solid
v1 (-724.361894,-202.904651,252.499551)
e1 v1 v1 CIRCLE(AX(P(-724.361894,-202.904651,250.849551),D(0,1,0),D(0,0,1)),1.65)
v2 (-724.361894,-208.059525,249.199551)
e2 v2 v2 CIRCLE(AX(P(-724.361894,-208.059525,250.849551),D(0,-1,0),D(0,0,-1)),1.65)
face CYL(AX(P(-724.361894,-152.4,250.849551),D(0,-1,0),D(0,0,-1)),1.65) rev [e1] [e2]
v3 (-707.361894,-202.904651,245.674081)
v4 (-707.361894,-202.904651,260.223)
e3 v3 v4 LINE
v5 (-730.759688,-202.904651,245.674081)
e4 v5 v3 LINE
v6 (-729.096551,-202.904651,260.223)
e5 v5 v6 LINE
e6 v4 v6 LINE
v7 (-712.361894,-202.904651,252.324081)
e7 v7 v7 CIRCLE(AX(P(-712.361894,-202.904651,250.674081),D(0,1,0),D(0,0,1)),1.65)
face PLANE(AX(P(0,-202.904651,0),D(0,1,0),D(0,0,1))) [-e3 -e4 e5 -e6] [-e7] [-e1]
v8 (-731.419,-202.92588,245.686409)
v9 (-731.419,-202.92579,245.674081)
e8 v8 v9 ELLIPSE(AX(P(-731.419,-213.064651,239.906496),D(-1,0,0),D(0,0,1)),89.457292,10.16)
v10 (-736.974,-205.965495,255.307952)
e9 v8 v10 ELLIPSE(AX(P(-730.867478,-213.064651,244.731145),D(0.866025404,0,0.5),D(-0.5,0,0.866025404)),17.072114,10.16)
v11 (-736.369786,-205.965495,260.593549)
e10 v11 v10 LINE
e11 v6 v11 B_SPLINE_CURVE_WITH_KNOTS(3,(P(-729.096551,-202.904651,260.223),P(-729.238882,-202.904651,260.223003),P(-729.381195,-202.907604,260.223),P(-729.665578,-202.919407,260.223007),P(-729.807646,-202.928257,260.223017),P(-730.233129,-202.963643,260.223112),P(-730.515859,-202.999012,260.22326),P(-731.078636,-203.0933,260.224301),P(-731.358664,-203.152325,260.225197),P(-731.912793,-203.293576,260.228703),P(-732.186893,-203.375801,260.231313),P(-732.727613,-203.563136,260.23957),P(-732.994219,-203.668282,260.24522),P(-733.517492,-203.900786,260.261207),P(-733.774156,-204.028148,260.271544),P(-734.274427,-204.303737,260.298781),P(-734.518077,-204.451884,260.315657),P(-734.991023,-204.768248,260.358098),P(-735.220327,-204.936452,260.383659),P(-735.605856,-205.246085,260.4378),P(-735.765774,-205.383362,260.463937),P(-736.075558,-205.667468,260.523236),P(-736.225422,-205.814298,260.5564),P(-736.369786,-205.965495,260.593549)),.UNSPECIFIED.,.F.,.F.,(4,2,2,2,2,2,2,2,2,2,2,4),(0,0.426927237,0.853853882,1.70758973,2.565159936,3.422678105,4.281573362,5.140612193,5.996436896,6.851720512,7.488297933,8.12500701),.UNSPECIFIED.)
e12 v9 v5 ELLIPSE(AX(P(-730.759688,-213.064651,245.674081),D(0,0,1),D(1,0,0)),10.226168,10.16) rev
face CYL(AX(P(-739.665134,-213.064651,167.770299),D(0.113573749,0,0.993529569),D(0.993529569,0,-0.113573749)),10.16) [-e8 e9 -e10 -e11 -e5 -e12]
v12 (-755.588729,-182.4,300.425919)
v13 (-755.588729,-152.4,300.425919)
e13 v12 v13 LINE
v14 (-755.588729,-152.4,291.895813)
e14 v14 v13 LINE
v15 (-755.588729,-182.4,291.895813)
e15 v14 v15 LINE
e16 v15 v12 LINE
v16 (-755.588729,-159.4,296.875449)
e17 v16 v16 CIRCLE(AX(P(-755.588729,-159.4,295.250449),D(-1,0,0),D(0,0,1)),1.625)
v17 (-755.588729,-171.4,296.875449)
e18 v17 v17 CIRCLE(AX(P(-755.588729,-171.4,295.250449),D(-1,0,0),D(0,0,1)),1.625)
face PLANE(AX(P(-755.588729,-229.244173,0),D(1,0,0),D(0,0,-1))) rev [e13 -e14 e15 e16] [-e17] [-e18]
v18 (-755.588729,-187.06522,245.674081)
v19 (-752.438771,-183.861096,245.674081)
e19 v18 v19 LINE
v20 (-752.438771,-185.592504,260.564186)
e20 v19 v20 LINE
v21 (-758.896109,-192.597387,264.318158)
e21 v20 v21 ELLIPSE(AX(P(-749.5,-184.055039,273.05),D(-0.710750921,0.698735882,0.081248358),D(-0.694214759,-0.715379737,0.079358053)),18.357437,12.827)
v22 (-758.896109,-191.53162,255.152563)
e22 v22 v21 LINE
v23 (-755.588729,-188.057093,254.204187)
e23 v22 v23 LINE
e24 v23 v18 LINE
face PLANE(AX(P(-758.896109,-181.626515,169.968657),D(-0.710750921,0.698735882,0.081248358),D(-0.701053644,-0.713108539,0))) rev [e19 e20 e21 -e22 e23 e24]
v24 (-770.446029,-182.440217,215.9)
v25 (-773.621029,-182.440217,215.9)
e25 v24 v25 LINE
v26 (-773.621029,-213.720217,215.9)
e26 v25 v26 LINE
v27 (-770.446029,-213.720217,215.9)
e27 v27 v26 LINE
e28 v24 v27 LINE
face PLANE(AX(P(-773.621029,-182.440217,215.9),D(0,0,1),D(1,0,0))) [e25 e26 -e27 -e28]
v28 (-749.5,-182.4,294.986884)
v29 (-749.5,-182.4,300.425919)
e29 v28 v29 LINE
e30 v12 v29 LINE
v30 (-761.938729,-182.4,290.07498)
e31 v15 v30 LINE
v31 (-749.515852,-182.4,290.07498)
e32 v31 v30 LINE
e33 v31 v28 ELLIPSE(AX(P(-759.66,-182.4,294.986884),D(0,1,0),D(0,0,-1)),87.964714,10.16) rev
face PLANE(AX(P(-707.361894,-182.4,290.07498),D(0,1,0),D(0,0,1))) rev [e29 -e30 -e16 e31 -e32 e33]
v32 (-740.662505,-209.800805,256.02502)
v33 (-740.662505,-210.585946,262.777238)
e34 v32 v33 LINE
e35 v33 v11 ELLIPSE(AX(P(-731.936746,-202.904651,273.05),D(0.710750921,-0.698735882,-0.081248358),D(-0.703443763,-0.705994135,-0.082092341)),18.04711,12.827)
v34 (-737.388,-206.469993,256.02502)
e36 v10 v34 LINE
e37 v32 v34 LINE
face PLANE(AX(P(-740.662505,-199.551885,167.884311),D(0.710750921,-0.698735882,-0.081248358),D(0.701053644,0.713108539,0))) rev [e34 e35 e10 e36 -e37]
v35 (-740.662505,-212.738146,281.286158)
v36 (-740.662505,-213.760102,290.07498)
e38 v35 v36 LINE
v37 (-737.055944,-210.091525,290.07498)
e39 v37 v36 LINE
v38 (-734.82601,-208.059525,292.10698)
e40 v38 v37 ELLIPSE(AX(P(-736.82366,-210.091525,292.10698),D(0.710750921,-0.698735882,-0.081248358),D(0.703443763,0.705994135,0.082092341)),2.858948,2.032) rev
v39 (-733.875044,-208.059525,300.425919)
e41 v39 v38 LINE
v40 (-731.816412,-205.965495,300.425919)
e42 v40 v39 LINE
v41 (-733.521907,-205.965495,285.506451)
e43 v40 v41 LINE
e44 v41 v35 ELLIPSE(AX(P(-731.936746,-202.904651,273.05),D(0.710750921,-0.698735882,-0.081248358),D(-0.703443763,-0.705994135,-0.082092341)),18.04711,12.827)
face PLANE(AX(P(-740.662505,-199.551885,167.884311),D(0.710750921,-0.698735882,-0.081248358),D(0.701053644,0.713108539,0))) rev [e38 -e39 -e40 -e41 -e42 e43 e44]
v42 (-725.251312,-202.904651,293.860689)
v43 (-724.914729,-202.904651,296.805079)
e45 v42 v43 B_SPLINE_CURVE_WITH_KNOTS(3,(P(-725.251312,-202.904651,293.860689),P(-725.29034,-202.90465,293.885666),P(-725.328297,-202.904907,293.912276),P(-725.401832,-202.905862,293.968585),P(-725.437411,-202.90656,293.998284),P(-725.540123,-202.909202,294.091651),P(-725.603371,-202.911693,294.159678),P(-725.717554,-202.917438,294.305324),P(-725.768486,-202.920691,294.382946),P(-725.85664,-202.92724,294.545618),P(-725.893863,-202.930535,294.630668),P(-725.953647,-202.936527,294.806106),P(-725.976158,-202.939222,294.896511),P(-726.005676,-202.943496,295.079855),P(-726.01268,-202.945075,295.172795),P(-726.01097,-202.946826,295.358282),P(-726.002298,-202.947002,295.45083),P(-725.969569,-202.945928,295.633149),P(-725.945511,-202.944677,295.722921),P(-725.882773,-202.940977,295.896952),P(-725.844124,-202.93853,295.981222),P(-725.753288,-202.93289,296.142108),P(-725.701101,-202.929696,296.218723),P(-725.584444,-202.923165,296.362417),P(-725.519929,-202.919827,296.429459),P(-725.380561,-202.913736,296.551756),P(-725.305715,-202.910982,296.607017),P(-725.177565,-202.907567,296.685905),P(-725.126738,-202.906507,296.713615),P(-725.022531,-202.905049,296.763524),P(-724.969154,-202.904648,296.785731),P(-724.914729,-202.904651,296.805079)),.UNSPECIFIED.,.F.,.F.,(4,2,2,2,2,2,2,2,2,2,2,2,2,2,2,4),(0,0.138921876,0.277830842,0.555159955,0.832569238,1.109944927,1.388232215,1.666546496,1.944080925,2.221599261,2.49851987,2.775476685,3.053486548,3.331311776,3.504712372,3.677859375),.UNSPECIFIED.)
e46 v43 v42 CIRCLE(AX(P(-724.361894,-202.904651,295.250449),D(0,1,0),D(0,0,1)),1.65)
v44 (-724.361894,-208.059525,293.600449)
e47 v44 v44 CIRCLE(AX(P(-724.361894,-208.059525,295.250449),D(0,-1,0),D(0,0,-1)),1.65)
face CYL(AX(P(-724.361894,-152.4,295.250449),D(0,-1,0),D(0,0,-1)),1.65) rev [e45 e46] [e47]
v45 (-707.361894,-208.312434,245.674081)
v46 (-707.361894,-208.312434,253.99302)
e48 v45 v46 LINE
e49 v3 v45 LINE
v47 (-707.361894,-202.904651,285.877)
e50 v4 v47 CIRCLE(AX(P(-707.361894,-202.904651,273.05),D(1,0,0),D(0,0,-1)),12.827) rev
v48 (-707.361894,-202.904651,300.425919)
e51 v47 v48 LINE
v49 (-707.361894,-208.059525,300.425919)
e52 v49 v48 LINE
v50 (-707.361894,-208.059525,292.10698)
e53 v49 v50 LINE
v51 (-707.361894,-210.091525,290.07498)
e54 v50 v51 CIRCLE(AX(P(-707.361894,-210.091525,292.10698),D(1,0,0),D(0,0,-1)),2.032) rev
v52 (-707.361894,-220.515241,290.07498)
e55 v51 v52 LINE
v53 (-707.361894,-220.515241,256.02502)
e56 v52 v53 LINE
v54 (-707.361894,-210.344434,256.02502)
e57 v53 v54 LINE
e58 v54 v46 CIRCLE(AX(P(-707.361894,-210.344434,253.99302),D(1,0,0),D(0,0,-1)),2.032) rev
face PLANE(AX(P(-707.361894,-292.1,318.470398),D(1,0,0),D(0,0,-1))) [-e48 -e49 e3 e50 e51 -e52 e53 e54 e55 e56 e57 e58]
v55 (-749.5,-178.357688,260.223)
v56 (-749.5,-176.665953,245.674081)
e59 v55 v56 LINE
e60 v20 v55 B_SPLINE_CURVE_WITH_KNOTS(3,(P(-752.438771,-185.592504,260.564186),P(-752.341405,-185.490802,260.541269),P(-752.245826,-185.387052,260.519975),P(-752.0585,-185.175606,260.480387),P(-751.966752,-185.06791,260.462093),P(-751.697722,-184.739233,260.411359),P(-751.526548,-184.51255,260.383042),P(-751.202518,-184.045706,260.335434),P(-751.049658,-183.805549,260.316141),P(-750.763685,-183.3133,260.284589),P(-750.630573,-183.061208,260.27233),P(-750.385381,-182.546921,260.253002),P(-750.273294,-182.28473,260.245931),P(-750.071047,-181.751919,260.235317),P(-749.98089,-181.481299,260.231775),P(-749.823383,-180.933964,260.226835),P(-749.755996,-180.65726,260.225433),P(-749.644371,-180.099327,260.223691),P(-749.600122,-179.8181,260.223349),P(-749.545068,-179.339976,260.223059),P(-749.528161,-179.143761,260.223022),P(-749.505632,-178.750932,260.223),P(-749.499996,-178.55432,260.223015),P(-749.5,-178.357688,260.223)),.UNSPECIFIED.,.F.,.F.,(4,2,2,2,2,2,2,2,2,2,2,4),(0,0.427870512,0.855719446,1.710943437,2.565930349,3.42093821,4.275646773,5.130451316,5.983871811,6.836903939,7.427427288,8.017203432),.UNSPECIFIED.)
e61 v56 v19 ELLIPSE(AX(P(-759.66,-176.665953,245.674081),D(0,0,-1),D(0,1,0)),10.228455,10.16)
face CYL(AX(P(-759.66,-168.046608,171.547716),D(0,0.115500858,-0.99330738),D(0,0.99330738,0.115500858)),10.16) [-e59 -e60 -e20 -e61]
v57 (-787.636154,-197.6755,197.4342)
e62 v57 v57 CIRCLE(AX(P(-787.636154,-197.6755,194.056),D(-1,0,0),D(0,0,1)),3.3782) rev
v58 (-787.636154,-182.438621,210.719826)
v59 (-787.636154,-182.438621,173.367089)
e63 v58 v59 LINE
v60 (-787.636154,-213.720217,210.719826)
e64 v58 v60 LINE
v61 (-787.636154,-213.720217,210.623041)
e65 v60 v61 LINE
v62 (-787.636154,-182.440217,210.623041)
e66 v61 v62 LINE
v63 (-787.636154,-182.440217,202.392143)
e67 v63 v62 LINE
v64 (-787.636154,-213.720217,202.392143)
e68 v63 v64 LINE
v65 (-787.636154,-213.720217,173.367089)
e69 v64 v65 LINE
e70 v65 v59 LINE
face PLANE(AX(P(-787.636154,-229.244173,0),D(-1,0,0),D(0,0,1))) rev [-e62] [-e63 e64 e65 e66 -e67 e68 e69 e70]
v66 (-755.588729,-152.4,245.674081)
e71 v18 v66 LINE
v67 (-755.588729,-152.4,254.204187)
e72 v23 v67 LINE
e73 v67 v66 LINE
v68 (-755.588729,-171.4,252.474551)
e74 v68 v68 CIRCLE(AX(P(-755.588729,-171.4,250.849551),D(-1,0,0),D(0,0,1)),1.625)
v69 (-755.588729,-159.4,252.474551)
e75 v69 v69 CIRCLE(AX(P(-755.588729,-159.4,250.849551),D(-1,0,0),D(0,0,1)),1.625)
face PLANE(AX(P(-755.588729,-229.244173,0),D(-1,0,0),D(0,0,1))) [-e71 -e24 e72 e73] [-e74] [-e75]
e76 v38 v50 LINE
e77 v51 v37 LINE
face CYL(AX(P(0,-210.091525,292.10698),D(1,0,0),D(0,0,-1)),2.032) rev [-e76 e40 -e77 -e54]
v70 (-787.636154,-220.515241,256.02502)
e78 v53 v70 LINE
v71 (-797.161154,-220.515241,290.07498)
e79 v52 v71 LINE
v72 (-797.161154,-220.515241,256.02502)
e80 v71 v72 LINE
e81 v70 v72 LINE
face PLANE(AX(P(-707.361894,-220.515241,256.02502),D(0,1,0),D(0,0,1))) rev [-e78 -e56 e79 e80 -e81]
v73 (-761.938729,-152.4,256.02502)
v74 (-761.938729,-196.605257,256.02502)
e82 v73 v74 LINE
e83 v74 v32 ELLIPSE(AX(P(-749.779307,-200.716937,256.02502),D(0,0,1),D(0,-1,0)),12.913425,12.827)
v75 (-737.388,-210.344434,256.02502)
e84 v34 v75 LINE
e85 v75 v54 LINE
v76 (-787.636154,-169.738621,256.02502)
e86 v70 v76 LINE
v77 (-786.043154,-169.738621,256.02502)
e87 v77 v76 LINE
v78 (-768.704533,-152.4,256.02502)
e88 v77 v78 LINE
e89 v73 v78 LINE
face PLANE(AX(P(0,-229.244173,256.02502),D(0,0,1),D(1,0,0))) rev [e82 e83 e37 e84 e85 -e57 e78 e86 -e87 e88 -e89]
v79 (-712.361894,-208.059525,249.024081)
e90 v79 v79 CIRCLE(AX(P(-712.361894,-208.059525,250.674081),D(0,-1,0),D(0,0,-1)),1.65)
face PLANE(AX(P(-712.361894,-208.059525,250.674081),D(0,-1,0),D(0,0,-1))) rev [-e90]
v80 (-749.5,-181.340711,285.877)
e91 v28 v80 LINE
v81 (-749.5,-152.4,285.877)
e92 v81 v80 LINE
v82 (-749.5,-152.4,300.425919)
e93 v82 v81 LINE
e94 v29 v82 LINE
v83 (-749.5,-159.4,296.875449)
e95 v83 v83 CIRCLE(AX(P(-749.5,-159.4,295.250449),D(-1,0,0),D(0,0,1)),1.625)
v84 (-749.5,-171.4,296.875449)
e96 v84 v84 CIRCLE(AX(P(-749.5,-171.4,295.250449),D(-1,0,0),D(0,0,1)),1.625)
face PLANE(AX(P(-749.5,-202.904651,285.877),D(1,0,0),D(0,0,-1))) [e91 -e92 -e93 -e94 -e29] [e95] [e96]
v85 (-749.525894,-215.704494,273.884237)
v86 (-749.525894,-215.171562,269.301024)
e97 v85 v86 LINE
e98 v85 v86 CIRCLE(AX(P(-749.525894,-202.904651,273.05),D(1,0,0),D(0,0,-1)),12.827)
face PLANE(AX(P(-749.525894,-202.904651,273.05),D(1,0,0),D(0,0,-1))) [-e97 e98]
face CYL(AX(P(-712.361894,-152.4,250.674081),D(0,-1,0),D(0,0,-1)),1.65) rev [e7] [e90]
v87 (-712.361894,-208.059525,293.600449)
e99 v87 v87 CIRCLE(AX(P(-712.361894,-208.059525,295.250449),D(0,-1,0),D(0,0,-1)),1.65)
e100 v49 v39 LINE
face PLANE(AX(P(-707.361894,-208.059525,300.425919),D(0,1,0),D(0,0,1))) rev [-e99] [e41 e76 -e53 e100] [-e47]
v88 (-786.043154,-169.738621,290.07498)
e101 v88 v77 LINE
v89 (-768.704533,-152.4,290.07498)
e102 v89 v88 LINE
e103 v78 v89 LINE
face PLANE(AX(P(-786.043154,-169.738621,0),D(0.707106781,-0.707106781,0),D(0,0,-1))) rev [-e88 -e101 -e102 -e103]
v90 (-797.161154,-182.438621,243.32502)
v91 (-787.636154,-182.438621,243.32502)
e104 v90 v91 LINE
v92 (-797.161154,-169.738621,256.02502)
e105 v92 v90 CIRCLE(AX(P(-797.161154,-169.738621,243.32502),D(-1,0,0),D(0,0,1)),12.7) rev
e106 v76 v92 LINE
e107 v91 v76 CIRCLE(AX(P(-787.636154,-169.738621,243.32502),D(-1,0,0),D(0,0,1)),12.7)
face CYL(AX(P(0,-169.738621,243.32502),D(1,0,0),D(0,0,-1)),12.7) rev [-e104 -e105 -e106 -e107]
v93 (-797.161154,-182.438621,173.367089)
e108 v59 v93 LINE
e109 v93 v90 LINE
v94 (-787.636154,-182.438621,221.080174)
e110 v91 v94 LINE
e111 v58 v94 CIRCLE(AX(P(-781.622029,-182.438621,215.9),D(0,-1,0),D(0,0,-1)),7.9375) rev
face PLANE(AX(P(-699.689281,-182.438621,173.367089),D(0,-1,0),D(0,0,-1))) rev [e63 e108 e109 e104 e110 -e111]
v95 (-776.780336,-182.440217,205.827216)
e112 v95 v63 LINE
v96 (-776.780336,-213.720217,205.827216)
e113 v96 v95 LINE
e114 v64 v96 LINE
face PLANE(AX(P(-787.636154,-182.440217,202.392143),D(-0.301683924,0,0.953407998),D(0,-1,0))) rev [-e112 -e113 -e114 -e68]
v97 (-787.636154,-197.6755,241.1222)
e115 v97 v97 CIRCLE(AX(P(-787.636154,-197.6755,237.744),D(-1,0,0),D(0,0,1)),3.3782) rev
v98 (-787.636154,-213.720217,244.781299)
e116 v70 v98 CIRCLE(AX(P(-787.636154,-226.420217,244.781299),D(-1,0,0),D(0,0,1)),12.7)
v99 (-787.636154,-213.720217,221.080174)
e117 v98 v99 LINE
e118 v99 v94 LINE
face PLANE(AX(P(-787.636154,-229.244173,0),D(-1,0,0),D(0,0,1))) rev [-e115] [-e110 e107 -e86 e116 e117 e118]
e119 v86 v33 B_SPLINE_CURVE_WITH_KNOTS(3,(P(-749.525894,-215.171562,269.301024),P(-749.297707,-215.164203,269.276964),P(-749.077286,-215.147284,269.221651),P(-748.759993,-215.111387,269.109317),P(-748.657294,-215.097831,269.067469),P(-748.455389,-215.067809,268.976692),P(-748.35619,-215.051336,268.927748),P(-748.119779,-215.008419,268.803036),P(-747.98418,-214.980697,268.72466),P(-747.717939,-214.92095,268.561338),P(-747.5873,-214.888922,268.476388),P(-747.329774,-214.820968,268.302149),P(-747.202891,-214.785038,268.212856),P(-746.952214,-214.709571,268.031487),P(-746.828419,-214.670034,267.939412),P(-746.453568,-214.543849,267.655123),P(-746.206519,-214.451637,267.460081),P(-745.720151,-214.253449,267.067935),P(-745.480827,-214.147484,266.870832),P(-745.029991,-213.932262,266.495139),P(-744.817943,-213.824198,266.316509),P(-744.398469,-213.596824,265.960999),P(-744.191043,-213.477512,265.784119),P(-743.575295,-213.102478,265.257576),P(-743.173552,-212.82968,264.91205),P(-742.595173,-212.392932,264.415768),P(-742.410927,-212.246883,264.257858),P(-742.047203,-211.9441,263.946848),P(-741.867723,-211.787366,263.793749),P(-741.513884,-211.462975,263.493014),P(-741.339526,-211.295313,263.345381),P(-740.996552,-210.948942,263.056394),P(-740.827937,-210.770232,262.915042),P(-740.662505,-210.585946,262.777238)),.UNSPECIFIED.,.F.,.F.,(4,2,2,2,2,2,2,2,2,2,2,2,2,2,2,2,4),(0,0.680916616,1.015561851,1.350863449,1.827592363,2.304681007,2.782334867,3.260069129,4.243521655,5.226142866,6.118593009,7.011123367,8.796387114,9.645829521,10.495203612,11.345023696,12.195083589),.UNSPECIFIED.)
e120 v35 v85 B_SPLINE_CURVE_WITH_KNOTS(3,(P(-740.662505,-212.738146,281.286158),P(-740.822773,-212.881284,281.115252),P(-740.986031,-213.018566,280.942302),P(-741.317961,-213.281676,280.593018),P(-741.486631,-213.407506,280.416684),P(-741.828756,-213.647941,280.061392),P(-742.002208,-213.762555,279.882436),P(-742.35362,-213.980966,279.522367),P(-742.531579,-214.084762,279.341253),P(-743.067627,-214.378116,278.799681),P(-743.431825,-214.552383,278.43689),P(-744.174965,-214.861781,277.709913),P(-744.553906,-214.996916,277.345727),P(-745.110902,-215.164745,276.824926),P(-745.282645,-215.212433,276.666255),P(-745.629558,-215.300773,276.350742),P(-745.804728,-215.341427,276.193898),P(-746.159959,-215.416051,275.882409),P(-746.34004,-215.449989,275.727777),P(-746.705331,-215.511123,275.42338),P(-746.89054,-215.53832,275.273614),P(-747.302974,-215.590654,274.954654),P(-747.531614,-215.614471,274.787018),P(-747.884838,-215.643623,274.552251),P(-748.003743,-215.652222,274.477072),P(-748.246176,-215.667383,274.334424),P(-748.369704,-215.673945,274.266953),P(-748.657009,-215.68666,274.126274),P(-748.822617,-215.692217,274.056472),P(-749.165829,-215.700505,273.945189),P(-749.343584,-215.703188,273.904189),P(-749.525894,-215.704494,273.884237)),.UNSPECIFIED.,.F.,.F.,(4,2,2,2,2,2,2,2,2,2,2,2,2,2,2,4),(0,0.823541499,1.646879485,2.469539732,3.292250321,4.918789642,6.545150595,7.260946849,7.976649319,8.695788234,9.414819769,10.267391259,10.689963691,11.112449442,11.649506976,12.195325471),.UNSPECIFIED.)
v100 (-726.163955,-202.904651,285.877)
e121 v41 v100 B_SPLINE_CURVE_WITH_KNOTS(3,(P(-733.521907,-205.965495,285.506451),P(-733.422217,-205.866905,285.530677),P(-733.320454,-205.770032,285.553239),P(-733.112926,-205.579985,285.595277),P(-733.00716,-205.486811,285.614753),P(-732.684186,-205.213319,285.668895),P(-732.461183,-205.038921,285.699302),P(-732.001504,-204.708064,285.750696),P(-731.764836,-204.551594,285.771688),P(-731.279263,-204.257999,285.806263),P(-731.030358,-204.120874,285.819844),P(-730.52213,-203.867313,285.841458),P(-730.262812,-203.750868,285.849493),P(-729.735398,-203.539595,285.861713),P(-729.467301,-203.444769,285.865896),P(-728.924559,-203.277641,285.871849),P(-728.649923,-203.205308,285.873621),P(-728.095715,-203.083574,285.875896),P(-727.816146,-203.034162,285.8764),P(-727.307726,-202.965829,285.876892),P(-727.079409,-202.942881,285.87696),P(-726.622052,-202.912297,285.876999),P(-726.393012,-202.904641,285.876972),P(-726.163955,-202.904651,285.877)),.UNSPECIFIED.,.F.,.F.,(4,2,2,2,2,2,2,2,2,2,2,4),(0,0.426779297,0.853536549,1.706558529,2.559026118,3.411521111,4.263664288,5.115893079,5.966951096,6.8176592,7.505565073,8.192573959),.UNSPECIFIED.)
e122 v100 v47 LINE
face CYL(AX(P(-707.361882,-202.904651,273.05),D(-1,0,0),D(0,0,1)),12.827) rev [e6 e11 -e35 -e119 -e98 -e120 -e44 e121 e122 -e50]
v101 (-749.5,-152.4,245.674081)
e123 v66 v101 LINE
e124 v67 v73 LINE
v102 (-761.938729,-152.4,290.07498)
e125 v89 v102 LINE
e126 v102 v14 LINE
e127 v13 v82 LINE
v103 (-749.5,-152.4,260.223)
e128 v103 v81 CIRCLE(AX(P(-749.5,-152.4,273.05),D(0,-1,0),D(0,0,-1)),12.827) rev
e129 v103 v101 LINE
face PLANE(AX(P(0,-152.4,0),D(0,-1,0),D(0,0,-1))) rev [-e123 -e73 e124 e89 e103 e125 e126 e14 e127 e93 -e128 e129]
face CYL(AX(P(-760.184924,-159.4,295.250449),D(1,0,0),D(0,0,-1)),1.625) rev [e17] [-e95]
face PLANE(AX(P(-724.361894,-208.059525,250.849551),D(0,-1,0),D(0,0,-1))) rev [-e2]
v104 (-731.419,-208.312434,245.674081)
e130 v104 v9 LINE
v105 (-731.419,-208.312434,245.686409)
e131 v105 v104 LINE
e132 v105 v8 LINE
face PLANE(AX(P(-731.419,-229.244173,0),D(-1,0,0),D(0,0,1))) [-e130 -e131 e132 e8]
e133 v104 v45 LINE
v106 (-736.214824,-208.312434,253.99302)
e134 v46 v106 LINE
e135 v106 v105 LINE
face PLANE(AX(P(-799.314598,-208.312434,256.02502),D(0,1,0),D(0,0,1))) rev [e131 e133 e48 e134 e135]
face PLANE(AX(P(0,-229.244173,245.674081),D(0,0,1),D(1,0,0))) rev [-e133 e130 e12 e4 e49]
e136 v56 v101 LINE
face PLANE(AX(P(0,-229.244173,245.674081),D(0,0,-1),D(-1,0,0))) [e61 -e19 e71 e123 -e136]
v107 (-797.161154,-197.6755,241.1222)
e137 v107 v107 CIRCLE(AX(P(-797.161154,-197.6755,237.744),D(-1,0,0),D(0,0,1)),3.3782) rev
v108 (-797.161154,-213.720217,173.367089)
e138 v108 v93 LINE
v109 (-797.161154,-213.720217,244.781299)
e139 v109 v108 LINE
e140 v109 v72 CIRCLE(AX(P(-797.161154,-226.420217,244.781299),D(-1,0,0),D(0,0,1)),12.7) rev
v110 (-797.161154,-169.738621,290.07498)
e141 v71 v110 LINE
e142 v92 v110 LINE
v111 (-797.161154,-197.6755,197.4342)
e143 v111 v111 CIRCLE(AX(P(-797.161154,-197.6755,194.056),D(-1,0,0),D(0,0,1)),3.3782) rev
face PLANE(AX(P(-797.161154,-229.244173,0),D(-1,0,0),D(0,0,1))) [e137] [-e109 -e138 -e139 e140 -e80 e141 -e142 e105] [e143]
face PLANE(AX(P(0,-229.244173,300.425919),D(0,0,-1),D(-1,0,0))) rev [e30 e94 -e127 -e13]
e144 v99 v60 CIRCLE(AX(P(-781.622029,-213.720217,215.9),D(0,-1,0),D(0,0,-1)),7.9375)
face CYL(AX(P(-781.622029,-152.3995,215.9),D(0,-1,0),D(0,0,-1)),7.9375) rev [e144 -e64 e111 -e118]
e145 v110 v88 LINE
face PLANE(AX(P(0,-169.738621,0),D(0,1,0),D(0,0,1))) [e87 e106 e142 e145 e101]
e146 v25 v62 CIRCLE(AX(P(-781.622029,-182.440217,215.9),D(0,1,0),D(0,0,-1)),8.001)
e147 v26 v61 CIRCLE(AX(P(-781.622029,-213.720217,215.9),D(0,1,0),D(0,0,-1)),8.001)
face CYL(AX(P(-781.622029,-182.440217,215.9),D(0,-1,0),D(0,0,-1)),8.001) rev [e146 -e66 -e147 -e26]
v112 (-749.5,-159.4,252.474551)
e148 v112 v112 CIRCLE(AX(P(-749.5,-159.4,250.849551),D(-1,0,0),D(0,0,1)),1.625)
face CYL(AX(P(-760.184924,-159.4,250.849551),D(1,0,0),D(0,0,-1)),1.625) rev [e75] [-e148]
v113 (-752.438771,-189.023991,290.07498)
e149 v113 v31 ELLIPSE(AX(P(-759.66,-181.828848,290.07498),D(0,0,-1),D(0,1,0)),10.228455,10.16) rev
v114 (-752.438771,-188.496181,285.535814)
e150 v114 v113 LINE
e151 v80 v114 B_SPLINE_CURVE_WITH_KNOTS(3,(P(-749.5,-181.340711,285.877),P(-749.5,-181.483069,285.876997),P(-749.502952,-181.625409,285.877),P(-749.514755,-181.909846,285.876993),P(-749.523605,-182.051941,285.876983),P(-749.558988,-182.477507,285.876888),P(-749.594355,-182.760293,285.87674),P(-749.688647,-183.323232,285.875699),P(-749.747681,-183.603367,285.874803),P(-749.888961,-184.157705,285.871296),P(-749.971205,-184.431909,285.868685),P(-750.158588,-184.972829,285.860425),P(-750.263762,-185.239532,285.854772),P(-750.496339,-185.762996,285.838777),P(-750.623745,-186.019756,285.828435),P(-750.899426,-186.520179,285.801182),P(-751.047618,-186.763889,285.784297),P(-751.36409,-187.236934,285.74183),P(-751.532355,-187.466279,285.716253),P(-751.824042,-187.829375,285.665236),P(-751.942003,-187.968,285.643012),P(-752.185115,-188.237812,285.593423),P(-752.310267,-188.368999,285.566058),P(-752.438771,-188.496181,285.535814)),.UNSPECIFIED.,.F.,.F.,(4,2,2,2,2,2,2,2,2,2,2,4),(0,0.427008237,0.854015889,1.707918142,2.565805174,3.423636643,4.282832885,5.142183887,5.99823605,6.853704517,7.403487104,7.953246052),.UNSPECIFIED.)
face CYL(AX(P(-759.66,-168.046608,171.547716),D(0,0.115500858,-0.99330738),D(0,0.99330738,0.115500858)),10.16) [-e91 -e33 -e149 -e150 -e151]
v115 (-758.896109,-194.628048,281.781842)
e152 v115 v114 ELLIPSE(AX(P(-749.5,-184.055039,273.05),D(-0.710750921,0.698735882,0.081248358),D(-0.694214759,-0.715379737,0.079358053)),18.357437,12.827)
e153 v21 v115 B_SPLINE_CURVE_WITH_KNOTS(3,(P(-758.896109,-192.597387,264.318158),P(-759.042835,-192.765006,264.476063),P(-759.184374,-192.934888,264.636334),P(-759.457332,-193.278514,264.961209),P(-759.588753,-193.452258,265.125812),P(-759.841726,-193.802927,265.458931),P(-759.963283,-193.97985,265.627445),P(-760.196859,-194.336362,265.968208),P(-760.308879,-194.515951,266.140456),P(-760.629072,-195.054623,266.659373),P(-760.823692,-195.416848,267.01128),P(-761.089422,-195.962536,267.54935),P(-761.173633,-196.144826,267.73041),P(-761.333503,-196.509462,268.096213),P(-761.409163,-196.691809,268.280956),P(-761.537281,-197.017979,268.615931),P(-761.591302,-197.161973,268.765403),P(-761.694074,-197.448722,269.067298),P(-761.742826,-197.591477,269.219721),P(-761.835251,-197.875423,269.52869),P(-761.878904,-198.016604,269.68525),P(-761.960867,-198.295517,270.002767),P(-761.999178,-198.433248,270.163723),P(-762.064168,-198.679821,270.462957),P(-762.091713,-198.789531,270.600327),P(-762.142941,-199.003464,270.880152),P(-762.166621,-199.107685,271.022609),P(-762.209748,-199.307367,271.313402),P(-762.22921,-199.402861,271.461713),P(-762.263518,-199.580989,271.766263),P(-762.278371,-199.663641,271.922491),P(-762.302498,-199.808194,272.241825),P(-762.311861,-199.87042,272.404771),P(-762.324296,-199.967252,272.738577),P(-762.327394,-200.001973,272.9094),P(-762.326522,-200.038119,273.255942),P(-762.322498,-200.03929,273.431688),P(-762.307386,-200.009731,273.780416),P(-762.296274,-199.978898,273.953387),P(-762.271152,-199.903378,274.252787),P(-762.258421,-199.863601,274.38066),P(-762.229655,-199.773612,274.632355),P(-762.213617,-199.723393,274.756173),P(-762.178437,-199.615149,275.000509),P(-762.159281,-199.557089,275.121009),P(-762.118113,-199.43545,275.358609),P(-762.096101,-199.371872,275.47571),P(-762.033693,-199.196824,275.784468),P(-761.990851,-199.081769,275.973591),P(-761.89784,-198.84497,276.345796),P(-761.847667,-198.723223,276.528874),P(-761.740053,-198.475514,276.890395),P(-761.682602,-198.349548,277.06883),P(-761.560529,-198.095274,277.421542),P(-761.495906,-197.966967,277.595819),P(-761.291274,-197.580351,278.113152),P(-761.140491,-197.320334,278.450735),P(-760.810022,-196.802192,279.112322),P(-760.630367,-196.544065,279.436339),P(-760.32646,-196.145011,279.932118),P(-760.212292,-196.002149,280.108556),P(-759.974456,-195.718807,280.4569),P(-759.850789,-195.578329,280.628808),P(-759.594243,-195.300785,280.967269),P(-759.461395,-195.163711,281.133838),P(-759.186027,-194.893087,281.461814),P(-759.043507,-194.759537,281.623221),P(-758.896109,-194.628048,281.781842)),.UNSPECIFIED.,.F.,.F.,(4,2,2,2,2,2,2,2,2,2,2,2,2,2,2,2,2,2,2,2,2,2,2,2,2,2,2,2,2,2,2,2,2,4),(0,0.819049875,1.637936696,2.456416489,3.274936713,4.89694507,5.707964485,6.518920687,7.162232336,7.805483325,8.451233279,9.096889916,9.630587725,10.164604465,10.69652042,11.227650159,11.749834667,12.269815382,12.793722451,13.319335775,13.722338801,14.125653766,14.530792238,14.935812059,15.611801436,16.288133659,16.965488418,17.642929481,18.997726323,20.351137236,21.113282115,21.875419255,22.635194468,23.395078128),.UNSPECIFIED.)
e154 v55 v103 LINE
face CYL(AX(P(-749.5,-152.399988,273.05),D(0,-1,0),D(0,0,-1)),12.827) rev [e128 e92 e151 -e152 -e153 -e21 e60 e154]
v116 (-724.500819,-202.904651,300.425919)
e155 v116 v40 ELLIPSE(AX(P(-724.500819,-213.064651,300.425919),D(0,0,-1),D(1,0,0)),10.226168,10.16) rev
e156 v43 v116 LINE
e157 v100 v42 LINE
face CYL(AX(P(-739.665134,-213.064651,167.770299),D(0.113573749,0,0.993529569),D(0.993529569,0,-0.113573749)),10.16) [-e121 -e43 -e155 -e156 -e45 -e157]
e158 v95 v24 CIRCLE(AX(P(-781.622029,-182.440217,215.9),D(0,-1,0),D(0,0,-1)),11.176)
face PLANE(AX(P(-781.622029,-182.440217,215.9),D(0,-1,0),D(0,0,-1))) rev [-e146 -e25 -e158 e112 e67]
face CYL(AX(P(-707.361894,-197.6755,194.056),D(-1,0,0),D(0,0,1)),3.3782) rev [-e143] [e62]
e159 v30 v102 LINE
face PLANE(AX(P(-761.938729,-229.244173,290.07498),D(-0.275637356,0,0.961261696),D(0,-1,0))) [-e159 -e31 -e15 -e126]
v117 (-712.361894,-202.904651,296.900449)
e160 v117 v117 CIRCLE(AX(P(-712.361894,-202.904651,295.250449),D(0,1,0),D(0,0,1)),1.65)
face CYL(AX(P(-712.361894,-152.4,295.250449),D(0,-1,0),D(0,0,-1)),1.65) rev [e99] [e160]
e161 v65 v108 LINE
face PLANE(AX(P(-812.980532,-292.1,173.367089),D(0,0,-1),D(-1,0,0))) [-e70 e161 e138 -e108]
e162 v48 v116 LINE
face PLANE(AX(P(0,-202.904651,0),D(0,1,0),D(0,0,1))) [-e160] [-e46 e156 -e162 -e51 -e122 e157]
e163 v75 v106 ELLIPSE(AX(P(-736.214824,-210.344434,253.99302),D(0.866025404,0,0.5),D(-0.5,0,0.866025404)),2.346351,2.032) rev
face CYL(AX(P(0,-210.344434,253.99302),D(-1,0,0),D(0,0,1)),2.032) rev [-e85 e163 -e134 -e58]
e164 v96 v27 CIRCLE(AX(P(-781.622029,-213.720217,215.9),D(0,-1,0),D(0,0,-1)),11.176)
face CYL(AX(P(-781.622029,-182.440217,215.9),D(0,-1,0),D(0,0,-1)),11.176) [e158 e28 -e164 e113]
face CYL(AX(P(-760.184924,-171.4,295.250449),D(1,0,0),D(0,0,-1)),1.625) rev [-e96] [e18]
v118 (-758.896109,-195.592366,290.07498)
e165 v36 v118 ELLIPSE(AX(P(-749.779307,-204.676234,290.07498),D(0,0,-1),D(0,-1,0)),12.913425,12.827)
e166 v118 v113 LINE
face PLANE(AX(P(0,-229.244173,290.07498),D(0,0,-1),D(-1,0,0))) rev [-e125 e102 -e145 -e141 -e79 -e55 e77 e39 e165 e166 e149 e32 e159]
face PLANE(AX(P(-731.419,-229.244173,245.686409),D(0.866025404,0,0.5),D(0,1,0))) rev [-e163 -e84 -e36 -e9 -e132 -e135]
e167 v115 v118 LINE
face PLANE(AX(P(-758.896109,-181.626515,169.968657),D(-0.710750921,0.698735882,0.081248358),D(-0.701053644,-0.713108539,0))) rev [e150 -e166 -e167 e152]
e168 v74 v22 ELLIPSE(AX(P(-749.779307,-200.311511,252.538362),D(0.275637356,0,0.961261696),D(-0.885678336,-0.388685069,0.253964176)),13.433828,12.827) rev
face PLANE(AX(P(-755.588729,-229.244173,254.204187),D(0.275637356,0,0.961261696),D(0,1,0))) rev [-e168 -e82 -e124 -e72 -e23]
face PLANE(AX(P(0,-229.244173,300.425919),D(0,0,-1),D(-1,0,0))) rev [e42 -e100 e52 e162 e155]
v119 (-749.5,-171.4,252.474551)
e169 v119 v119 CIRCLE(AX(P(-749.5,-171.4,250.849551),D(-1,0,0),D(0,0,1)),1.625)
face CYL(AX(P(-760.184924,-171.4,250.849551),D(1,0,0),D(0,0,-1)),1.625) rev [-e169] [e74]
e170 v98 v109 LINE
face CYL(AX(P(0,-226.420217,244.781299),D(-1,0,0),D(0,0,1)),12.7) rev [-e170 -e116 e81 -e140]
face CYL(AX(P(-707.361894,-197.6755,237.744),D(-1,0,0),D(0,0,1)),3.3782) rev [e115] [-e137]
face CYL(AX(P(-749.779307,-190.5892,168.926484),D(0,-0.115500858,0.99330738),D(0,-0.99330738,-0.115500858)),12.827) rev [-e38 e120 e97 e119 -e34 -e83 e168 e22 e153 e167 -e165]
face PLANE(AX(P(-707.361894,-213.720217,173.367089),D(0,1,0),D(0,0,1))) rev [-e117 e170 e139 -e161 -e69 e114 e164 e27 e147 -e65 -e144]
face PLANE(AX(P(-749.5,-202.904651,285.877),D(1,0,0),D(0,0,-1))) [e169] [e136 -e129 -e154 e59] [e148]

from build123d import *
from OCP.BRepFilletAPI import BRepFilletAPI_MakeChamfer
from build123d.topology import SkipClean

# Parameters (mm, degrees)
BOSS_EXTRUDE1_START      = -152.4
SKETCH2_W                = 105.618637884
SKETCH2_H                = 145.103309092
BOSS_EXTRUDE1_DEPTH      = 139.7
CUT_EXTRUDE2_DEPTH       = 885.237993682
CUT_EXTRUDE2_DEPTH_BACK  = 51.562
SKETCH5_R                = 12.827
CUT_EXTRUDE3_DEPTH       = 445.860765858
CUT_EXTRUDE3_DEPTH_BACK  = 42.164
SKETCH6_R                = 12.827
CUT_EXTRUDE4_DEPTH       = 445.860765858
CUT_EXTRUDE4_DEPTH_BACK  = 445.860765858
CUT_EXTRUDE5_DEPTH       = 50.504651
CUT_EXTRUDE6_DEPTH       = 407.363854058
CUT_EXTRUDE6_DEPTH_BACK  = 407.363854058
SKETCH9_R                = 3.3782
CUT_EXTRUDE7_DEPTH       = 877.507710408
CUT_EXTRUDE7_DEPTH_BACK  = 877.507710408
SKETCH10_W               = 42.138106051
SKETCH10_H               = 18.044478892
SKETCH14_W               = 10.350939284
SKETCH14_H               = 12.032329604
CUT_EXTRUDE9_DEPTH       = 389.423133713
SKETCH15_R               = 7.9375
CUT_EXTRUDE10_DEPTH      = 855.097071361
BOSS_EXTRUDE3_DEPTH      = 31.28
CUT_EXTRUDE11_REACH      = 385.336
SKETCH17_W               = 10.350939284
SKETCH17_H               = 5.407782796
CUT_EXTRUDE12_REACH      = 385.336
SKETCH18_W               = 82.65793149
SKETCH18_H               = 30.038621058
SKETCH20_R               = 1.625
CUT_EXTRUDE13_DEPTH      = 6.088729488
SKETCH21_R               = 1.65
CUT_EXTRUDE14_DEPTH      = 854.709330565
FILLET1_R                = 2.032
FILLET2_R                = 12.7
CUT_EXTRUDE15_DEPTH      = 825.577740132
CUT_EXTRUDE15_DEPTH_BACK = 825.577740132
FILLET3_R                = 10.16
CUT_EXTRUDE16_DEPTH      = 855.611797525
CUT_EXTRUDE16_DEPTH_BACK = 17.338621
SKETCH23_W               = 28.46620038
SKETCH23_H               = 34.049959426
CHAMFER1_SIZE            = 17.3482
CHAMFER2_START           = -213.720216756
CHAMFER2_DEPTH           = 31.28
CHAMFER2_2_DEPTH         = 31.28
CHAMFER3_SIZE            = 5.969
CHAMFER3_SIZE2           = 10.33861127
CHAMFER4_SIZE            = 6.35
CHAMFER4_SIZE2           = 1.8208332


with BuildPart() as part:
    # Sketch2 → Boss-Extrude1 (new body)
    with BuildSketch(Plane(origin=(0, 0, 0), x_dir=(1, 0, 0), z_dir=(0, 1, 0)).offset(BOSS_EXTRUDE1_START)):
        with Locations((-760.171212891, -245.918743343)):
            Rectangle(SKETCH2_W, SKETCH2_H)
    extrude(amount=-BOSS_EXTRUDE1_DEPTH)

    # Sketch5 → Cut-Extrude2 (cut, two sides: drawn at the far end of the back side and taken through both)
    with BuildSketch(Plane(origin=(0, -152.4, 0), x_dir=(1, 0, 0), z_dir=(0, 1, 0)).offset(-CUT_EXTRUDE2_DEPTH_BACK)):
        with Locations(Location((-749.5, -273.05, 0), (0, 0, 90))):
            Circle(SKETCH5_R)
    extrude(amount=CUT_EXTRUDE2_DEPTH + CUT_EXTRUDE2_DEPTH_BACK, mode=Mode.SUBTRACT)

    # Sketch6 → Cut-Extrude3 (cut, two sides: drawn at the far end of the back side and taken through both)
    with SkipClean():  # the faces are left unmerged after this step: merging them gives an invalid solid
        with BuildSketch(Plane(origin=(-707.361893949, 0, 0), x_dir=(0, 0, -1), z_dir=(1, 0, 0)).offset(-CUT_EXTRUDE3_DEPTH_BACK)):
            with Locations((-273.05, -202.904651163)):
                Circle(SKETCH6_R)
        extrude(amount=CUT_EXTRUDE3_DEPTH + CUT_EXTRUDE3_DEPTH_BACK, mode=Mode.SUBTRACT)

    # Sketch7 → Cut-Extrude4 (cut, two sides: drawn at the far end of the back side and taken through both)
    with SkipClean():  # the faces are left unmerged after this step: merging them gives an invalid solid
        with BuildSketch(Plane.ZY.offset(812.980531833).offset(-CUT_EXTRUDE4_DEPTH_BACK)):
            Polygon((173.367088797, -229.244173065), (318.470397889, -229.244173065), (436.616381599, -1092.879705033), (85.103632852, -1063.090489038), align=None)
        extrude(amount=CUT_EXTRUDE4_DEPTH + CUT_EXTRUDE4_DEPTH_BACK, mode=Mode.SUBTRACT)

    # Sketch8 → Cut-Extrude5 (cut)
    with BuildSketch(Plane.XZ.offset(152.4)):
        Polygon((-749.5, 285.877), (-749.5, 318.470397889), (-702.312681678, 322.788236882), (-679.04046523, 133.358726973), (-749.5, 173.367088797), (-749.5, 260.223), align=None)
    extrude(amount=CUT_EXTRUDE5_DEPTH, mode=Mode.SUBTRACT)

    # Sketch9 → Cut-Extrude6 (cut, two sides: drawn at the far end of the back side and taken through both)
    with BuildSketch(Plane.ZY.offset(812.980531833).offset(-CUT_EXTRUDE6_DEPTH_BACK)):
        with Locations((237.744, -197.6755)):
            Circle(SKETCH9_R)
        with Locations((194.056, -197.6755)):
            Circle(SKETCH9_R)
    extrude(amount=CUT_EXTRUDE6_DEPTH + CUT_EXTRUDE6_DEPTH_BACK, mode=Mode.SUBTRACT)

    # Sketch10 → Cut-Extrude7 (cut, two sides: drawn at the far end of the back side and taken through both)
    with BuildSketch(Plane(origin=(0, -152.4, 0), x_dir=(1, 0, 0), z_dir=(0, 1, 0)).offset(-CUT_EXTRUDE7_DEPTH_BACK)):
        Polygon((-797.161154045, -290.074979713), (-797.161154045, -173.367088797), (-812.980531833, -173.367088797), (-812.980531833, -318.470397889), (-778.610494828, -318.470397889), (-749.5, -318.470397889), (-749.5, -300.425918997), (-755.588729488, -300.425918997), (-755.588729488, -290.074979713), align=None)
        with BuildLine():
            Line((-704.994967799, -245.674081003), (-704.994967799, -173.367088797))
            Line((-704.994967799, -173.367088797), (-749.5, -173.367088797))
            Line((-749.5, -173.367088797), (-749.5, -245.674081003))
            Line((-749.5, -245.674081003), (-749.5, -254.969))
            ThreePointArc((-749.5, -254.969), (-746.410185862, -255.23496114), (-743.411270512, -256.025020287))
            Line((-743.411270512, -256.025020287), (-731.419, -256.025020287))
            Line((-731.419, -256.025020287), (-731.419, -245.674081003))
            Line((-731.419, -245.674081003), (-704.994967799, -245.674081003))
        make_face()
        Polygon((-749.5, -245.674081003), (-749.5, -173.367088797), (-787.636154045, -173.367088797), (-787.636154045, -256.025020287), (-755.588729488, -256.025020287), (-755.588729488, -245.674081003), align=None)
        with Locations((-728.430946975, -309.448158443)):
            Rectangle(SKETCH10_W, SKETCH10_H)
    extrude(amount=CUT_EXTRUDE7_DEPTH + CUT_EXTRUDE7_DEPTH_BACK, mode=Mode.SUBTRACT)

    # Sketch14 → Cut-Extrude9 (cut, through all)
    with BuildSketch(Plane.ZY.offset(797.161154045)):
        Polygon((173.367088797, -229.244173065), (173.367088797, -213.720216756), (256.025020287, -213.720216756), (256.025020287, -220.515241206), (290.074979713, -220.515241206), (290.074979713, -208.059525422), (300.425918997, -208.059525422), (300.425918997, -229.244173065), (290.074979713, -229.244173065), (256.025020287, -229.244173065), align=None)
        with Locations((295.250449355, -188.416164802)):
            Rectangle(SKETCH14_W, SKETCH14_H)
    extrude(amount=-CUT_EXTRUDE9_DEPTH, mode=Mode.SUBTRACT)

    # Sketch15 → Cut-Extrude10 (cut, through all)
    with BuildSketch(Plane.XZ.offset(213.720216756)):
        with Locations((-781.622028853, 215.9)):
            Circle(SKETCH15_R)
    extrude(amount=-CUT_EXTRUDE10_DEPTH, mode=Mode.SUBTRACT)

    # Sketch16 → Boss-Extrude3 (add)
    with BuildSketch(Plane.XZ.offset(213.720216756)):
        with BuildLine():
            Line((-789.623028853, 215.9), (-792.798028853, 215.9))
            ThreePointArc((-792.798028853, 215.9), (-781.622028853, 204.724), (-770.446028853, 215.9))
            Line((-770.446028853, 215.9), (-773.621028853, 215.9))
            ThreePointArc((-773.621028853, 215.9), (-781.622028853, 207.899), (-789.623028853, 215.9))
        make_face()
    extrude(amount=-BOSS_EXTRUDE3_DEPTH)

    # Cut-Extrude11: up to this face of the body (flat: up to its plane)
    cut_extrude11_end = Plane(part.part.faces().sort_by_distance((-787.636154045, -182.811410497, 238.56635645))[0])
    # Sketch17 → Cut-Extrude11 (cut, up to the picked face)
    with BuildSketch(Plane(origin=(-707.361893949, 0, 0), x_dir=(0, 0, -1), z_dir=(1, 0, 0)), mode=Mode.PRIVATE) as cut_extrude11_sk1:
        with Locations((-250.849550645, -211.016325358)):
            Rectangle(SKETCH17_W, SKETCH17_H)
    cut_extrude11_tool1 = split(extrude(cut_extrude11_sk1.sketch, amount=-CUT_EXTRUDE11_REACH, mode=Mode.PRIVATE), bisect_by=cut_extrude11_end, keep=Keep.BOTH, mode=Mode.PRIVATE)
    add(cut_extrude11_tool1.solids().sort_by(Axis((-707.361894, -211.016325, 250.849551), (-1, 0, 0)))[0], mode=Mode.SUBTRACT)

    # Cut-Extrude12: up to this face of the body (flat: up to its plane)
    cut_extrude12_end = Plane(part.part.faces().sort_by_distance((-787.636154045, -181.897567062, 191.002801609))[0])
    # Sketch18 → Cut-Extrude12 (cut, up to the picked face)
    with BuildSketch(Plane.ZY.offset(797.161154045), mode=Mode.PRIVATE) as cut_extrude12_sk1:
        with Locations((214.696054542, -167.419310529)):
            Rectangle(SKETCH18_W, SKETCH18_H)
    cut_extrude12_tool1 = split(extrude(cut_extrude12_sk1.sketch, amount=-CUT_EXTRUDE12_REACH, mode=Mode.PRIVATE), bisect_by=cut_extrude12_end, keep=Keep.BOTH, mode=Mode.PRIVATE)
    add(cut_extrude12_tool1.solids().sort_by(Axis((-797.161154, -167.419311, 214.696055), (1, 0, 0)))[0], mode=Mode.SUBTRACT)

    # Sketch20 → Cut-Extrude13 (cut)
    with BuildSketch(Plane.ZY.offset(749.5)):
        with Locations((295.250449355, -159.4)):
            Circle(SKETCH20_R)
        with Locations((295.250449355, -171.4)):
            Circle(SKETCH20_R)
        with Locations((250.849550645, -159.4)):
            Circle(SKETCH20_R)
        with Locations((250.849550645, -171.4)):
            Circle(SKETCH20_R)
    extrude(amount=CUT_EXTRUDE13_DEPTH, mode=Mode.SUBTRACT)

    # Sketch21 → Cut-Extrude14 (cut, through all)
    with BuildSketch(Plane.XZ.offset(208.059525422)):
        with Locations(Location((-724.361893949, 295.250449355, 0), (0, 0, 270))):
            Circle(SKETCH21_R)
        with Locations(Location((-712.361893949, 295.250449355, 0), (0, 0, 270))):
            Circle(SKETCH21_R)
        with Locations(Location((-724.361893949, 250.849550645, 0), (0, 0, 270))):
            Circle(SKETCH21_R)
        with Locations(Location((-712.361893949, 250.674081003, 0), (0, 0, 270))):
            Circle(SKETCH21_R)
    extrude(amount=-CUT_EXTRUDE14_DEPTH, mode=Mode.SUBTRACT)

    # Fillet1
    fillet1_edges = [part.edges().sort_by_distance(p)[0] for p in [
        (-731.475311718, -208.059525422, 290.074979713),
        (-719.390446974, -208.31243396, 256.025020287),
    ]]
    fillet(fillet1_edges, radius=FILLET1_R)

    # Fillet2
    # the kernel refuses this fillet: 12.7 mm, written as the material it adds along each edge
    with BuildSketch(Plane(origin=(-797.161154045, -213.720216756, 256.025020287), x_dir=(0, -1, 0), z_dir=(1, 0, 0))) as fillet2_piece_1:
        with BuildLine():
            CenterArc((12.7, 11.243721081), FILLET2_R, 180, 62.292450476)
            Line((0, 11.243721081), (-0.254, 11.243721081))
            Line((-0.254, 11.243721081), (-0.254, 0))
            Line((-0.254, 0), (0, -0.254))
            ThreePointArc((0, -0.254), (3.397512225, -0.254), (6.676924939, -0.224874422))
            Line((6.676924939, -0.224874422), (6.79502445, 0))
        make_face()
    extrude(amount=9.525)
    with BuildSketch(Plane(origin=(-797.161154045, -182.438621058, 256.025020287), x_dir=(0, 1, 0), z_dir=(1, 0, 0))) as fillet2_piece_2:
        with BuildLine():
            CenterArc((FILLET2_R, -FILLET2_R), FILLET2_R, 90, 90)
            Line((0, -FILLET2_R), (-FILLET2_R * 0.02, -FILLET2_R))
            Line((-FILLET2_R * 0.02, -FILLET2_R), (-FILLET2_R * 0.02, FILLET2_R * 0.02))
            Line((-FILLET2_R * 0.02, FILLET2_R * 0.02), (FILLET2_R, FILLET2_R * 0.02))
            Line((FILLET2_R, FILLET2_R * 0.02), (FILLET2_R, 0))
        make_face()
    extrude(amount=9.525)

    # Sketch22 → Cut-Extrude15 (cut, two sides: drawn at the far end of the back side and taken through both)
    with BuildSketch(Plane(origin=(0, -30.880009338, 265.568080309), x_dir=(1, 0, 0), z_dir=(0, -0.11550085817456393, 0.9933073803012538)).offset(-CUT_EXTRUDE15_DEPTH_BACK)):
        with BuildLine():
            Line((-758.896109044, -160.779431747), (-743.9675024, -145.695751323))
            Line((-743.9675024, -145.695751323), (-725.733898271, -163.741897627))
            Line((-725.733898271, -163.741897627), (-740.662504915, -178.825578052))
            ThreePointArc((-740.662504915, -178.825578052), (-758.802380132, -178.919306964), (-758.896109044, -160.779431747))
        make_face()
    extrude(amount=CUT_EXTRUDE15_DEPTH + CUT_EXTRUDE15_DEPTH_BACK, mode=Mode.SUBTRACT)

    # Fillet3
    # the kernel refuses this fillet: 10.16 mm, written as the material it takes off along each edge
    with BuildSketch(Plane(origin=(-749.5, -183.769844105, 270.597328126), x_dir=(-0.7034437633396176, -0.7059941354664443, -0.08209234133330717), z_dir=(0, 0.11550085817456394, -0.9933073803012537))) as fillet3_piece_1:
        with BuildLine():
            CenterArc((FILLET3_R * 0.411190053836, FILLET3_R), FILLET3_R, 225.296045218, 44.703954782)
            Line((-FILLET3_R * 0.292253709504, FILLET3_R * 0.289249078918), (0, 0))
            Line((0, 0), (FILLET3_R * 0.411190053836, 0))
        make_face()
    extrude(amount=35.535400168, mode=Mode.SUBTRACT)
    with BuildSketch(Plane(origin=(-732.188194017, -202.904651, 270.850357431), x_dir=(0.993529568575603, 0, -0.11357374857763594), z_dir=(-0.11357374857763593, 0, -0.993529568575603))) as fillet3_piece_2:
        with BuildLine():
            CenterArc((FILLET3_R * 0.421124757706, FILLET3_R), FILLET3_R, 224.325671398, 45.674328602)
            Line((-FILLET3_R * 0.294254978904, FILLET3_R * 0.301264118248), (0, 0))
            Line((0, 0), (FILLET3_R * 0.421124757706, 0))
        make_face()
    extrude(amount=25.618457044, mode=Mode.SUBTRACT)
    with BuildSketch(Plane(origin=(-727.59246143, -202.904651, 311.053276428), x_dir=(-0.6942147591455071, -0.7153797366098971, 0.07935805335629142), z_dir=(-0.11357374857763593, 0, -0.993529568575603))) as fillet3_piece_3:
        with BuildLine():
            CenterArc((FILLET3_R * 0.421124757706, -FILLET3_R), FILLET3_R, 90, 45.674328602)
            Line((-FILLET3_R * 0.294254978904, -FILLET3_R * 0.301264118248), (0, 0))
            Line((0, 0), (FILLET3_R * 0.421124757706, 0))
        make_face()
    extrude(amount=36.03680755, mode=Mode.SUBTRACT)
    with BuildSketch(Plane(origin=(-749.5, -187.241004537, 300.449307839), x_dir=(-0.7034437633396176, -0.7059941354664443, -0.08209234133330717), z_dir=(0, 0.11550085817456394, -0.9933073803012537))) as fillet3_piece_4:
        with BuildLine():
            CenterArc((FILLET3_R * 0.411190053836, FILLET3_R), FILLET3_R, 225.296045218, 44.703954782)
            Line((-FILLET3_R * 0.292253709504, FILLET3_R * 0.289249078918), (0, 0))
            Line((0, 0), (FILLET3_R * 0.411190053836, 0))
        make_face()
    extrude(amount=25.114719229, mode=Mode.SUBTRACT)

    # Sketch23 → Cut-Extrude16 (cut, two sides: drawn at the far end of the back side and taken through both)
    with BuildSketch(Plane(origin=(0, -152.4, 0), x_dir=(1, 0, 0), z_dir=(0, 1, 0)).offset(-CUT_EXTRUDE16_DEPTH_BACK)):
        with Locations((-782.928053855, -273.05)):
            Rectangle(SKETCH23_W, SKETCH23_H)
    extrude(amount=CUT_EXTRUDE16_DEPTH + CUT_EXTRUDE16_DEPTH_BACK, mode=Mode.SUBTRACT)

    # Chamfer1
    # the kernel refuses this chamfer: 17.3482 mm, written as the material it adds along each edge
    with BuildSketch(Plane(origin=(-768.694953665, -169.738621, 290.074979713), x_dir=(-1, 0, 0), z_dir=(0, 0, -1))) as chamfer1_piece_1_section:
        Polygon((CHAMFER1_SIZE, 0), (0, CHAMFER1_SIZE), (0, 0), align=None)
    chamfer1_piece_1 = extrude(amount=34.049959426, mode=Mode.PRIVATE)
    chamfer1_piece_1 = split(chamfer1_piece_1, bisect_by=Plane(origin=(-768.694953665, -152.4, 290.074979713), z_dir=(0, -1, 0)), keep=Keep.TOP, mode=Mode.PRIVATE)
    add(chamfer1_piece_1)

    # Chamfer2: read off the stored shape, not the designer's step
    # Chamfer2 outline → Chamfer2 (cut)
    with BuildSketch(Plane(origin=(0, 0, 0), x_dir=(1, 0, 0), z_dir=(0, 1, 0)).offset(CHAMFER2_START)):
        with BuildLine():
            ThreePointArc((-776.780335722, -205.827215697), (-778.25040932, -205.244712218), (-779.787979207, -204.875516434))
            Line((-779.787979207, -204.875516434), (-776.780335722, -205.827215697))
        make_face()
    extrude(amount=CHAMFER2_DEPTH, mode=Mode.SUBTRACT)

    # Chamfer2 2 outline → Chamfer2 2 (add)
    with BuildSketch(Plane(origin=(0, 0, 0), x_dir=(1, 0, 0), z_dir=(0, 1, 0)).offset(CHAMFER2_START)):
        with BuildLine():
            Line((-779.787979207, -204.875516434), (-787.636154045, -202.392142911))
            Line((-787.636154045, -202.392142911), (-787.636154045, -206.480165916))
            ThreePointArc((-787.636154045, -206.480165916), (-783.860774681, -204.950525441), (-779.787979207, -204.875516434))
        make_face()
    extrude(amount=CHAMFER2_2_DEPTH)

    # Chamfer3
    chamfer3_edges = [part.edges().sort_by_distance(p)[0] for p in [
        (-731.419, -206.707684668, 256.025020287),
    ]]
    chamfer3_side = [part.faces().sort_by_distance(p)[0] for p in [
        (-762.95297508, -193.800929084, 256.025020287),
    ]]
    chamfer(chamfer3_edges, length=CHAMFER3_SIZE, length2=CHAMFER3_SIZE2, reference=chamfer3_side[0])

    # Chamfer4: one chamfer whose edges measure the first distance from different faces: ONE call of the kernel's chamfer builder (chamfer() names one face for all edges)
    chamfer4_edges_1 = [part.edges().sort_by_distance(p)[0] for p in [
        (-755.588729488, -170.33440865, 256.025020287),
    ]]
    chamfer4_side_1 = [part.faces().sort_by_distance(p)[0] for p in [
        (-763.393423187, -193.595325956, 256.025020287),
    ]]
    chamfer4_edges_2 = [part.edges().sort_by_distance(p)[0] for p in [
        (-755.588729488, -167.4, 290.074979713),
    ]]
    chamfer4_side_2 = [part.faces().sort_by_distance(p)[0] for p in [
        (-768.5704824, -193.114216517, 290.074979713),
    ]]
    chamfer4 = BRepFilletAPI_MakeChamfer(part.part.solid().wrapped)
    for e in chamfer4_edges_1:
        chamfer4.Add(CHAMFER4_SIZE, CHAMFER4_SIZE2, e.wrapped, chamfer4_side_1[0].wrapped)  # the first distance lies on this face
    for e in chamfer4_edges_2:
        chamfer4.Add(CHAMFER4_SIZE, CHAMFER4_SIZE2, e.wrapped, chamfer4_side_2[0].wrapped)  # the first distance lies on this face
    add(Compound.cast(chamfer4.Shape()), mode=Mode.REPLACE)


solid = part.part
